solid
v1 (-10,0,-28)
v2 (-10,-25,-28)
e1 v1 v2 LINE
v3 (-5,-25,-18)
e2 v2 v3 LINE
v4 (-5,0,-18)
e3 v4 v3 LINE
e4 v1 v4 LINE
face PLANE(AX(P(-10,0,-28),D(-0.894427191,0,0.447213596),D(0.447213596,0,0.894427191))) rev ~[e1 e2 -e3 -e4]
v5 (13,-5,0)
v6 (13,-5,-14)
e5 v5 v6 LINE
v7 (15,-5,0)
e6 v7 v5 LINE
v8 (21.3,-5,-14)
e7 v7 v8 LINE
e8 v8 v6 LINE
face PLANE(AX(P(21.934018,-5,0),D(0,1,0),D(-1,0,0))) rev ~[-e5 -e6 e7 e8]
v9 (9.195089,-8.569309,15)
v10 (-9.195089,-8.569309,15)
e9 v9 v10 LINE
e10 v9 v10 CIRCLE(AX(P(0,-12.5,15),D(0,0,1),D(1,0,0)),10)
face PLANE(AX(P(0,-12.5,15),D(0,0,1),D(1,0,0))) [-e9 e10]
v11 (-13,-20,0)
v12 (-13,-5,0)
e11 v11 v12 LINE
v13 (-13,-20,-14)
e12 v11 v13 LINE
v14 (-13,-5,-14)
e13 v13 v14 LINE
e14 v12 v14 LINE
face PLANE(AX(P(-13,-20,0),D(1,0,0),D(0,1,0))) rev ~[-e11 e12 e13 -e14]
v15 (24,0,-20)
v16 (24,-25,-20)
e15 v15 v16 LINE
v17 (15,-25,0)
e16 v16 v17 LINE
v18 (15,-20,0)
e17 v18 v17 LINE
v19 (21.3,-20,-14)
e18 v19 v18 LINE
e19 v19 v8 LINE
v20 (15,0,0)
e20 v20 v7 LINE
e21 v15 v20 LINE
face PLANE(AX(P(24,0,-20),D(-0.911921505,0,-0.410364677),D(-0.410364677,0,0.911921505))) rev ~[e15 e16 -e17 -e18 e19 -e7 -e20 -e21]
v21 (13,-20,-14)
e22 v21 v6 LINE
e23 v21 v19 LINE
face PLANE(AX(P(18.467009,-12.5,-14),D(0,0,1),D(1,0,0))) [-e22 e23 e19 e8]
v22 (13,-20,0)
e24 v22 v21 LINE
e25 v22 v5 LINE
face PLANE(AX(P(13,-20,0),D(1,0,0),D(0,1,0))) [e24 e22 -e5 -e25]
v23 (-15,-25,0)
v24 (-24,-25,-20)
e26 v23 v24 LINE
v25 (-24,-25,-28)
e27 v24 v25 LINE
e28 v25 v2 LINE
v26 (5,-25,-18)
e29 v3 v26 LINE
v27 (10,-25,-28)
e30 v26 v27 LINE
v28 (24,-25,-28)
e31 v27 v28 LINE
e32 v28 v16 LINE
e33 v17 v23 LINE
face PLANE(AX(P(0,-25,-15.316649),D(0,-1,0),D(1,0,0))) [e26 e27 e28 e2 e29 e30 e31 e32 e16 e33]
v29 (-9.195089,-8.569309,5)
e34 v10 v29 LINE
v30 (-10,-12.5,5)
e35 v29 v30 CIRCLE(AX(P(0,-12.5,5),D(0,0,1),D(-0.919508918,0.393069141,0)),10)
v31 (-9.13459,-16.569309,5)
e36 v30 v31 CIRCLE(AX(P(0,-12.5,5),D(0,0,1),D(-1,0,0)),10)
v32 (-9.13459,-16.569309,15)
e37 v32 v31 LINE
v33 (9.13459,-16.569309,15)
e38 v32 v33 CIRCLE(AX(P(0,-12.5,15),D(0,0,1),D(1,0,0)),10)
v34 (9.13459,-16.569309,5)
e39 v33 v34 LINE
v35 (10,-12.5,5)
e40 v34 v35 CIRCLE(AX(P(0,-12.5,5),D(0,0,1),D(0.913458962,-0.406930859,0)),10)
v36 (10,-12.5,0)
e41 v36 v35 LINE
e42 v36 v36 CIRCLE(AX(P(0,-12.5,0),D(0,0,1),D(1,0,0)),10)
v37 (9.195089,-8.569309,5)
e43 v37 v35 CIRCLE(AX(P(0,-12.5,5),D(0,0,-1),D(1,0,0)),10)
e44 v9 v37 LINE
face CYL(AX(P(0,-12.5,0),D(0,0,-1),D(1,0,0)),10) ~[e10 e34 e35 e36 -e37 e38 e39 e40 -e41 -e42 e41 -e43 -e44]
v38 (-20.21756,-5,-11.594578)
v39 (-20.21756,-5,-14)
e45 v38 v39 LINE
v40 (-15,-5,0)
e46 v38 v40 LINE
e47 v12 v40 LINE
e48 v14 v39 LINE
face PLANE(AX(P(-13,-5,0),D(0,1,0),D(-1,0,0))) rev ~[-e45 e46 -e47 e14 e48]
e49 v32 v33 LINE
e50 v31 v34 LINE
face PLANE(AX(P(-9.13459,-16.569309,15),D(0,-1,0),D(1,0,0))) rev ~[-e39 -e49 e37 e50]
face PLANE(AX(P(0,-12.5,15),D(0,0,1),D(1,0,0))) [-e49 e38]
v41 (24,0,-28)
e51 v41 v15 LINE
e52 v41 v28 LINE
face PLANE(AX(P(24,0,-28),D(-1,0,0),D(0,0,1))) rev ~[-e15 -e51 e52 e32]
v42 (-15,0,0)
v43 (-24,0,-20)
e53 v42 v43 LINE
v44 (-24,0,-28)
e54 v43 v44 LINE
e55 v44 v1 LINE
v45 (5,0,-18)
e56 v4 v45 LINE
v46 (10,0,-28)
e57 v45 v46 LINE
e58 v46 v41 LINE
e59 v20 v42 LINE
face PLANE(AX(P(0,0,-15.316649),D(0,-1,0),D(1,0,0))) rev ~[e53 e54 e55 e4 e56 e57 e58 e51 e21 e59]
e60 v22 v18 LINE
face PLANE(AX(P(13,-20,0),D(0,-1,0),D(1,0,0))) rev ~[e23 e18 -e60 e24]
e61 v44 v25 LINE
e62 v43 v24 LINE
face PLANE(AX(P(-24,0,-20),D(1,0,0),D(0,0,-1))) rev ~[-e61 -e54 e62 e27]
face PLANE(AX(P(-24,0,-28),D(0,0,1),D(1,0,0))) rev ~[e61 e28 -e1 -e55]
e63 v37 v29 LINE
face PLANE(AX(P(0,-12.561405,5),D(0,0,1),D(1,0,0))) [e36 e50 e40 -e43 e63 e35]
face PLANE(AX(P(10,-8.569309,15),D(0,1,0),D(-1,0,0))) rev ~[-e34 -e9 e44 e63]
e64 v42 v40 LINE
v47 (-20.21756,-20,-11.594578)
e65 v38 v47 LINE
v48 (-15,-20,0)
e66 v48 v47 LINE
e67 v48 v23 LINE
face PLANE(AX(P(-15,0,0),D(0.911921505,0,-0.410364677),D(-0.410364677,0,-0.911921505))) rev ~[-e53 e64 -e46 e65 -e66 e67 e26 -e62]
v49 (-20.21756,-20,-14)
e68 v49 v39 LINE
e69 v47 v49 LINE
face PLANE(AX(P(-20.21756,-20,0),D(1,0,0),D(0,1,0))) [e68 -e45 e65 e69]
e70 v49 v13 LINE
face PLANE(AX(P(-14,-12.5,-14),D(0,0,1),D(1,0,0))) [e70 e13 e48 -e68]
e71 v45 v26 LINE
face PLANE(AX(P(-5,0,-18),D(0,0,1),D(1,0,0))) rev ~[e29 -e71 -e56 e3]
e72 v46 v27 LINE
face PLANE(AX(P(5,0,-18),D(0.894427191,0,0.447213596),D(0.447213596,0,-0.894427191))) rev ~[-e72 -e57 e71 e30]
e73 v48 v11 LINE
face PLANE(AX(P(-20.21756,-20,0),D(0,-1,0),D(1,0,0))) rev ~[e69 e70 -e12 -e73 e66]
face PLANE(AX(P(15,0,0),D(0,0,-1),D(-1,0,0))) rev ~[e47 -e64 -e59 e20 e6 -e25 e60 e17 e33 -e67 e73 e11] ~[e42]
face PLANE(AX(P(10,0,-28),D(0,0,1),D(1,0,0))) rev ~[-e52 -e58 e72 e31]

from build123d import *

# Parameters (mm, degrees)
F1_DEPTH  = 25
F3_W      = 2
F3_H      = 15
F3_W_2    = 5.2175602431
F4_DEPTH  = 14
F5_W      = 6.9340183245
F5_H      = 15
F5_W_2    = 2
F6_DEPTH  = 14
F7_R      = 10
F8_DEPTH  = 15
F10_DEPTH = 10


with BuildPart() as f1:
    # F0 (on Front) → F1 (new body)
    with BuildSketch(Plane.XZ):
        Polygon((10, -28), (24, -28), (24, -20), (15, 0), (-15, 0), (-24, -20), (-24, -28), (-10, -28), (-5, -18), (5, -18), align=None)
    extrude(amount=F1_DEPTH)

    # F3 (on face) → F4 (cut)
    with BuildSketch(Plane.XY):
        with Locations((-14, -12.5)):
            Rectangle(F3_W, F3_H)
        with Locations((-17.6087801216, -12.5)):
            Rectangle(F3_W_2, F3_H)
    extrude(amount=-F4_DEPTH, mode=Mode.SUBTRACT)

    # F5 (on face) → F6 (cut)
    with BuildSketch(Plane.XY):
        with Locations((18.4670091623, -12.5)):
            Rectangle(F5_W, F5_H)
        with Locations((14, -12.5)):
            Rectangle(F5_W_2, F5_H)
    extrude(amount=-F6_DEPTH, mode=Mode.SUBTRACT)

    # F7 (on face) → F8 (join)
    with BuildSketch(Plane.XY):
        with Locations((0, -12.5)):
            Circle(F7_R)
    extrude(amount=F8_DEPTH)

    # F9 (on face) → F10 (cut)
    with BuildSketch(Plane.XY.offset(15)):
        with BuildLine():
            Line((9.1950891808, -8.5693085904), (-9.1950891808, -8.5693085904))
            ThreePointArc((-9.1950891808, -8.5693085904), (-9.79670587, -10.4938708676), (-10, -12.5))
            ThreePointArc((-10, -12.5), (-9.7812549358, -14.5801566962), (-9.1345896238, -16.5693085904))
            Line((-9.1345896238, -16.5693085904), (9.1345896238, -16.5693085904))
            ThreePointArc((9.1345896238, -16.5693085904), (9.7812549358, -14.5801566962), (10, -12.5))
            ThreePointArc((10, -12.5), (9.79670587, -10.4938708676), (9.1950891808, -8.5693085904))
        make_face()
        with BuildLine():
            Line((10, -8.5693085904), (9.1950891808, -8.5693085904))
            ThreePointArc((9.1950891808, -8.5693085904), (9.79670587, -10.4938708676), (10, -12.5))
            Line((10, -12.5), (10, -8.5693085904))
        make_face()
    extrude(amount=-F10_DEPTH, mode=Mode.SUBTRACT)


solid = f1.part
